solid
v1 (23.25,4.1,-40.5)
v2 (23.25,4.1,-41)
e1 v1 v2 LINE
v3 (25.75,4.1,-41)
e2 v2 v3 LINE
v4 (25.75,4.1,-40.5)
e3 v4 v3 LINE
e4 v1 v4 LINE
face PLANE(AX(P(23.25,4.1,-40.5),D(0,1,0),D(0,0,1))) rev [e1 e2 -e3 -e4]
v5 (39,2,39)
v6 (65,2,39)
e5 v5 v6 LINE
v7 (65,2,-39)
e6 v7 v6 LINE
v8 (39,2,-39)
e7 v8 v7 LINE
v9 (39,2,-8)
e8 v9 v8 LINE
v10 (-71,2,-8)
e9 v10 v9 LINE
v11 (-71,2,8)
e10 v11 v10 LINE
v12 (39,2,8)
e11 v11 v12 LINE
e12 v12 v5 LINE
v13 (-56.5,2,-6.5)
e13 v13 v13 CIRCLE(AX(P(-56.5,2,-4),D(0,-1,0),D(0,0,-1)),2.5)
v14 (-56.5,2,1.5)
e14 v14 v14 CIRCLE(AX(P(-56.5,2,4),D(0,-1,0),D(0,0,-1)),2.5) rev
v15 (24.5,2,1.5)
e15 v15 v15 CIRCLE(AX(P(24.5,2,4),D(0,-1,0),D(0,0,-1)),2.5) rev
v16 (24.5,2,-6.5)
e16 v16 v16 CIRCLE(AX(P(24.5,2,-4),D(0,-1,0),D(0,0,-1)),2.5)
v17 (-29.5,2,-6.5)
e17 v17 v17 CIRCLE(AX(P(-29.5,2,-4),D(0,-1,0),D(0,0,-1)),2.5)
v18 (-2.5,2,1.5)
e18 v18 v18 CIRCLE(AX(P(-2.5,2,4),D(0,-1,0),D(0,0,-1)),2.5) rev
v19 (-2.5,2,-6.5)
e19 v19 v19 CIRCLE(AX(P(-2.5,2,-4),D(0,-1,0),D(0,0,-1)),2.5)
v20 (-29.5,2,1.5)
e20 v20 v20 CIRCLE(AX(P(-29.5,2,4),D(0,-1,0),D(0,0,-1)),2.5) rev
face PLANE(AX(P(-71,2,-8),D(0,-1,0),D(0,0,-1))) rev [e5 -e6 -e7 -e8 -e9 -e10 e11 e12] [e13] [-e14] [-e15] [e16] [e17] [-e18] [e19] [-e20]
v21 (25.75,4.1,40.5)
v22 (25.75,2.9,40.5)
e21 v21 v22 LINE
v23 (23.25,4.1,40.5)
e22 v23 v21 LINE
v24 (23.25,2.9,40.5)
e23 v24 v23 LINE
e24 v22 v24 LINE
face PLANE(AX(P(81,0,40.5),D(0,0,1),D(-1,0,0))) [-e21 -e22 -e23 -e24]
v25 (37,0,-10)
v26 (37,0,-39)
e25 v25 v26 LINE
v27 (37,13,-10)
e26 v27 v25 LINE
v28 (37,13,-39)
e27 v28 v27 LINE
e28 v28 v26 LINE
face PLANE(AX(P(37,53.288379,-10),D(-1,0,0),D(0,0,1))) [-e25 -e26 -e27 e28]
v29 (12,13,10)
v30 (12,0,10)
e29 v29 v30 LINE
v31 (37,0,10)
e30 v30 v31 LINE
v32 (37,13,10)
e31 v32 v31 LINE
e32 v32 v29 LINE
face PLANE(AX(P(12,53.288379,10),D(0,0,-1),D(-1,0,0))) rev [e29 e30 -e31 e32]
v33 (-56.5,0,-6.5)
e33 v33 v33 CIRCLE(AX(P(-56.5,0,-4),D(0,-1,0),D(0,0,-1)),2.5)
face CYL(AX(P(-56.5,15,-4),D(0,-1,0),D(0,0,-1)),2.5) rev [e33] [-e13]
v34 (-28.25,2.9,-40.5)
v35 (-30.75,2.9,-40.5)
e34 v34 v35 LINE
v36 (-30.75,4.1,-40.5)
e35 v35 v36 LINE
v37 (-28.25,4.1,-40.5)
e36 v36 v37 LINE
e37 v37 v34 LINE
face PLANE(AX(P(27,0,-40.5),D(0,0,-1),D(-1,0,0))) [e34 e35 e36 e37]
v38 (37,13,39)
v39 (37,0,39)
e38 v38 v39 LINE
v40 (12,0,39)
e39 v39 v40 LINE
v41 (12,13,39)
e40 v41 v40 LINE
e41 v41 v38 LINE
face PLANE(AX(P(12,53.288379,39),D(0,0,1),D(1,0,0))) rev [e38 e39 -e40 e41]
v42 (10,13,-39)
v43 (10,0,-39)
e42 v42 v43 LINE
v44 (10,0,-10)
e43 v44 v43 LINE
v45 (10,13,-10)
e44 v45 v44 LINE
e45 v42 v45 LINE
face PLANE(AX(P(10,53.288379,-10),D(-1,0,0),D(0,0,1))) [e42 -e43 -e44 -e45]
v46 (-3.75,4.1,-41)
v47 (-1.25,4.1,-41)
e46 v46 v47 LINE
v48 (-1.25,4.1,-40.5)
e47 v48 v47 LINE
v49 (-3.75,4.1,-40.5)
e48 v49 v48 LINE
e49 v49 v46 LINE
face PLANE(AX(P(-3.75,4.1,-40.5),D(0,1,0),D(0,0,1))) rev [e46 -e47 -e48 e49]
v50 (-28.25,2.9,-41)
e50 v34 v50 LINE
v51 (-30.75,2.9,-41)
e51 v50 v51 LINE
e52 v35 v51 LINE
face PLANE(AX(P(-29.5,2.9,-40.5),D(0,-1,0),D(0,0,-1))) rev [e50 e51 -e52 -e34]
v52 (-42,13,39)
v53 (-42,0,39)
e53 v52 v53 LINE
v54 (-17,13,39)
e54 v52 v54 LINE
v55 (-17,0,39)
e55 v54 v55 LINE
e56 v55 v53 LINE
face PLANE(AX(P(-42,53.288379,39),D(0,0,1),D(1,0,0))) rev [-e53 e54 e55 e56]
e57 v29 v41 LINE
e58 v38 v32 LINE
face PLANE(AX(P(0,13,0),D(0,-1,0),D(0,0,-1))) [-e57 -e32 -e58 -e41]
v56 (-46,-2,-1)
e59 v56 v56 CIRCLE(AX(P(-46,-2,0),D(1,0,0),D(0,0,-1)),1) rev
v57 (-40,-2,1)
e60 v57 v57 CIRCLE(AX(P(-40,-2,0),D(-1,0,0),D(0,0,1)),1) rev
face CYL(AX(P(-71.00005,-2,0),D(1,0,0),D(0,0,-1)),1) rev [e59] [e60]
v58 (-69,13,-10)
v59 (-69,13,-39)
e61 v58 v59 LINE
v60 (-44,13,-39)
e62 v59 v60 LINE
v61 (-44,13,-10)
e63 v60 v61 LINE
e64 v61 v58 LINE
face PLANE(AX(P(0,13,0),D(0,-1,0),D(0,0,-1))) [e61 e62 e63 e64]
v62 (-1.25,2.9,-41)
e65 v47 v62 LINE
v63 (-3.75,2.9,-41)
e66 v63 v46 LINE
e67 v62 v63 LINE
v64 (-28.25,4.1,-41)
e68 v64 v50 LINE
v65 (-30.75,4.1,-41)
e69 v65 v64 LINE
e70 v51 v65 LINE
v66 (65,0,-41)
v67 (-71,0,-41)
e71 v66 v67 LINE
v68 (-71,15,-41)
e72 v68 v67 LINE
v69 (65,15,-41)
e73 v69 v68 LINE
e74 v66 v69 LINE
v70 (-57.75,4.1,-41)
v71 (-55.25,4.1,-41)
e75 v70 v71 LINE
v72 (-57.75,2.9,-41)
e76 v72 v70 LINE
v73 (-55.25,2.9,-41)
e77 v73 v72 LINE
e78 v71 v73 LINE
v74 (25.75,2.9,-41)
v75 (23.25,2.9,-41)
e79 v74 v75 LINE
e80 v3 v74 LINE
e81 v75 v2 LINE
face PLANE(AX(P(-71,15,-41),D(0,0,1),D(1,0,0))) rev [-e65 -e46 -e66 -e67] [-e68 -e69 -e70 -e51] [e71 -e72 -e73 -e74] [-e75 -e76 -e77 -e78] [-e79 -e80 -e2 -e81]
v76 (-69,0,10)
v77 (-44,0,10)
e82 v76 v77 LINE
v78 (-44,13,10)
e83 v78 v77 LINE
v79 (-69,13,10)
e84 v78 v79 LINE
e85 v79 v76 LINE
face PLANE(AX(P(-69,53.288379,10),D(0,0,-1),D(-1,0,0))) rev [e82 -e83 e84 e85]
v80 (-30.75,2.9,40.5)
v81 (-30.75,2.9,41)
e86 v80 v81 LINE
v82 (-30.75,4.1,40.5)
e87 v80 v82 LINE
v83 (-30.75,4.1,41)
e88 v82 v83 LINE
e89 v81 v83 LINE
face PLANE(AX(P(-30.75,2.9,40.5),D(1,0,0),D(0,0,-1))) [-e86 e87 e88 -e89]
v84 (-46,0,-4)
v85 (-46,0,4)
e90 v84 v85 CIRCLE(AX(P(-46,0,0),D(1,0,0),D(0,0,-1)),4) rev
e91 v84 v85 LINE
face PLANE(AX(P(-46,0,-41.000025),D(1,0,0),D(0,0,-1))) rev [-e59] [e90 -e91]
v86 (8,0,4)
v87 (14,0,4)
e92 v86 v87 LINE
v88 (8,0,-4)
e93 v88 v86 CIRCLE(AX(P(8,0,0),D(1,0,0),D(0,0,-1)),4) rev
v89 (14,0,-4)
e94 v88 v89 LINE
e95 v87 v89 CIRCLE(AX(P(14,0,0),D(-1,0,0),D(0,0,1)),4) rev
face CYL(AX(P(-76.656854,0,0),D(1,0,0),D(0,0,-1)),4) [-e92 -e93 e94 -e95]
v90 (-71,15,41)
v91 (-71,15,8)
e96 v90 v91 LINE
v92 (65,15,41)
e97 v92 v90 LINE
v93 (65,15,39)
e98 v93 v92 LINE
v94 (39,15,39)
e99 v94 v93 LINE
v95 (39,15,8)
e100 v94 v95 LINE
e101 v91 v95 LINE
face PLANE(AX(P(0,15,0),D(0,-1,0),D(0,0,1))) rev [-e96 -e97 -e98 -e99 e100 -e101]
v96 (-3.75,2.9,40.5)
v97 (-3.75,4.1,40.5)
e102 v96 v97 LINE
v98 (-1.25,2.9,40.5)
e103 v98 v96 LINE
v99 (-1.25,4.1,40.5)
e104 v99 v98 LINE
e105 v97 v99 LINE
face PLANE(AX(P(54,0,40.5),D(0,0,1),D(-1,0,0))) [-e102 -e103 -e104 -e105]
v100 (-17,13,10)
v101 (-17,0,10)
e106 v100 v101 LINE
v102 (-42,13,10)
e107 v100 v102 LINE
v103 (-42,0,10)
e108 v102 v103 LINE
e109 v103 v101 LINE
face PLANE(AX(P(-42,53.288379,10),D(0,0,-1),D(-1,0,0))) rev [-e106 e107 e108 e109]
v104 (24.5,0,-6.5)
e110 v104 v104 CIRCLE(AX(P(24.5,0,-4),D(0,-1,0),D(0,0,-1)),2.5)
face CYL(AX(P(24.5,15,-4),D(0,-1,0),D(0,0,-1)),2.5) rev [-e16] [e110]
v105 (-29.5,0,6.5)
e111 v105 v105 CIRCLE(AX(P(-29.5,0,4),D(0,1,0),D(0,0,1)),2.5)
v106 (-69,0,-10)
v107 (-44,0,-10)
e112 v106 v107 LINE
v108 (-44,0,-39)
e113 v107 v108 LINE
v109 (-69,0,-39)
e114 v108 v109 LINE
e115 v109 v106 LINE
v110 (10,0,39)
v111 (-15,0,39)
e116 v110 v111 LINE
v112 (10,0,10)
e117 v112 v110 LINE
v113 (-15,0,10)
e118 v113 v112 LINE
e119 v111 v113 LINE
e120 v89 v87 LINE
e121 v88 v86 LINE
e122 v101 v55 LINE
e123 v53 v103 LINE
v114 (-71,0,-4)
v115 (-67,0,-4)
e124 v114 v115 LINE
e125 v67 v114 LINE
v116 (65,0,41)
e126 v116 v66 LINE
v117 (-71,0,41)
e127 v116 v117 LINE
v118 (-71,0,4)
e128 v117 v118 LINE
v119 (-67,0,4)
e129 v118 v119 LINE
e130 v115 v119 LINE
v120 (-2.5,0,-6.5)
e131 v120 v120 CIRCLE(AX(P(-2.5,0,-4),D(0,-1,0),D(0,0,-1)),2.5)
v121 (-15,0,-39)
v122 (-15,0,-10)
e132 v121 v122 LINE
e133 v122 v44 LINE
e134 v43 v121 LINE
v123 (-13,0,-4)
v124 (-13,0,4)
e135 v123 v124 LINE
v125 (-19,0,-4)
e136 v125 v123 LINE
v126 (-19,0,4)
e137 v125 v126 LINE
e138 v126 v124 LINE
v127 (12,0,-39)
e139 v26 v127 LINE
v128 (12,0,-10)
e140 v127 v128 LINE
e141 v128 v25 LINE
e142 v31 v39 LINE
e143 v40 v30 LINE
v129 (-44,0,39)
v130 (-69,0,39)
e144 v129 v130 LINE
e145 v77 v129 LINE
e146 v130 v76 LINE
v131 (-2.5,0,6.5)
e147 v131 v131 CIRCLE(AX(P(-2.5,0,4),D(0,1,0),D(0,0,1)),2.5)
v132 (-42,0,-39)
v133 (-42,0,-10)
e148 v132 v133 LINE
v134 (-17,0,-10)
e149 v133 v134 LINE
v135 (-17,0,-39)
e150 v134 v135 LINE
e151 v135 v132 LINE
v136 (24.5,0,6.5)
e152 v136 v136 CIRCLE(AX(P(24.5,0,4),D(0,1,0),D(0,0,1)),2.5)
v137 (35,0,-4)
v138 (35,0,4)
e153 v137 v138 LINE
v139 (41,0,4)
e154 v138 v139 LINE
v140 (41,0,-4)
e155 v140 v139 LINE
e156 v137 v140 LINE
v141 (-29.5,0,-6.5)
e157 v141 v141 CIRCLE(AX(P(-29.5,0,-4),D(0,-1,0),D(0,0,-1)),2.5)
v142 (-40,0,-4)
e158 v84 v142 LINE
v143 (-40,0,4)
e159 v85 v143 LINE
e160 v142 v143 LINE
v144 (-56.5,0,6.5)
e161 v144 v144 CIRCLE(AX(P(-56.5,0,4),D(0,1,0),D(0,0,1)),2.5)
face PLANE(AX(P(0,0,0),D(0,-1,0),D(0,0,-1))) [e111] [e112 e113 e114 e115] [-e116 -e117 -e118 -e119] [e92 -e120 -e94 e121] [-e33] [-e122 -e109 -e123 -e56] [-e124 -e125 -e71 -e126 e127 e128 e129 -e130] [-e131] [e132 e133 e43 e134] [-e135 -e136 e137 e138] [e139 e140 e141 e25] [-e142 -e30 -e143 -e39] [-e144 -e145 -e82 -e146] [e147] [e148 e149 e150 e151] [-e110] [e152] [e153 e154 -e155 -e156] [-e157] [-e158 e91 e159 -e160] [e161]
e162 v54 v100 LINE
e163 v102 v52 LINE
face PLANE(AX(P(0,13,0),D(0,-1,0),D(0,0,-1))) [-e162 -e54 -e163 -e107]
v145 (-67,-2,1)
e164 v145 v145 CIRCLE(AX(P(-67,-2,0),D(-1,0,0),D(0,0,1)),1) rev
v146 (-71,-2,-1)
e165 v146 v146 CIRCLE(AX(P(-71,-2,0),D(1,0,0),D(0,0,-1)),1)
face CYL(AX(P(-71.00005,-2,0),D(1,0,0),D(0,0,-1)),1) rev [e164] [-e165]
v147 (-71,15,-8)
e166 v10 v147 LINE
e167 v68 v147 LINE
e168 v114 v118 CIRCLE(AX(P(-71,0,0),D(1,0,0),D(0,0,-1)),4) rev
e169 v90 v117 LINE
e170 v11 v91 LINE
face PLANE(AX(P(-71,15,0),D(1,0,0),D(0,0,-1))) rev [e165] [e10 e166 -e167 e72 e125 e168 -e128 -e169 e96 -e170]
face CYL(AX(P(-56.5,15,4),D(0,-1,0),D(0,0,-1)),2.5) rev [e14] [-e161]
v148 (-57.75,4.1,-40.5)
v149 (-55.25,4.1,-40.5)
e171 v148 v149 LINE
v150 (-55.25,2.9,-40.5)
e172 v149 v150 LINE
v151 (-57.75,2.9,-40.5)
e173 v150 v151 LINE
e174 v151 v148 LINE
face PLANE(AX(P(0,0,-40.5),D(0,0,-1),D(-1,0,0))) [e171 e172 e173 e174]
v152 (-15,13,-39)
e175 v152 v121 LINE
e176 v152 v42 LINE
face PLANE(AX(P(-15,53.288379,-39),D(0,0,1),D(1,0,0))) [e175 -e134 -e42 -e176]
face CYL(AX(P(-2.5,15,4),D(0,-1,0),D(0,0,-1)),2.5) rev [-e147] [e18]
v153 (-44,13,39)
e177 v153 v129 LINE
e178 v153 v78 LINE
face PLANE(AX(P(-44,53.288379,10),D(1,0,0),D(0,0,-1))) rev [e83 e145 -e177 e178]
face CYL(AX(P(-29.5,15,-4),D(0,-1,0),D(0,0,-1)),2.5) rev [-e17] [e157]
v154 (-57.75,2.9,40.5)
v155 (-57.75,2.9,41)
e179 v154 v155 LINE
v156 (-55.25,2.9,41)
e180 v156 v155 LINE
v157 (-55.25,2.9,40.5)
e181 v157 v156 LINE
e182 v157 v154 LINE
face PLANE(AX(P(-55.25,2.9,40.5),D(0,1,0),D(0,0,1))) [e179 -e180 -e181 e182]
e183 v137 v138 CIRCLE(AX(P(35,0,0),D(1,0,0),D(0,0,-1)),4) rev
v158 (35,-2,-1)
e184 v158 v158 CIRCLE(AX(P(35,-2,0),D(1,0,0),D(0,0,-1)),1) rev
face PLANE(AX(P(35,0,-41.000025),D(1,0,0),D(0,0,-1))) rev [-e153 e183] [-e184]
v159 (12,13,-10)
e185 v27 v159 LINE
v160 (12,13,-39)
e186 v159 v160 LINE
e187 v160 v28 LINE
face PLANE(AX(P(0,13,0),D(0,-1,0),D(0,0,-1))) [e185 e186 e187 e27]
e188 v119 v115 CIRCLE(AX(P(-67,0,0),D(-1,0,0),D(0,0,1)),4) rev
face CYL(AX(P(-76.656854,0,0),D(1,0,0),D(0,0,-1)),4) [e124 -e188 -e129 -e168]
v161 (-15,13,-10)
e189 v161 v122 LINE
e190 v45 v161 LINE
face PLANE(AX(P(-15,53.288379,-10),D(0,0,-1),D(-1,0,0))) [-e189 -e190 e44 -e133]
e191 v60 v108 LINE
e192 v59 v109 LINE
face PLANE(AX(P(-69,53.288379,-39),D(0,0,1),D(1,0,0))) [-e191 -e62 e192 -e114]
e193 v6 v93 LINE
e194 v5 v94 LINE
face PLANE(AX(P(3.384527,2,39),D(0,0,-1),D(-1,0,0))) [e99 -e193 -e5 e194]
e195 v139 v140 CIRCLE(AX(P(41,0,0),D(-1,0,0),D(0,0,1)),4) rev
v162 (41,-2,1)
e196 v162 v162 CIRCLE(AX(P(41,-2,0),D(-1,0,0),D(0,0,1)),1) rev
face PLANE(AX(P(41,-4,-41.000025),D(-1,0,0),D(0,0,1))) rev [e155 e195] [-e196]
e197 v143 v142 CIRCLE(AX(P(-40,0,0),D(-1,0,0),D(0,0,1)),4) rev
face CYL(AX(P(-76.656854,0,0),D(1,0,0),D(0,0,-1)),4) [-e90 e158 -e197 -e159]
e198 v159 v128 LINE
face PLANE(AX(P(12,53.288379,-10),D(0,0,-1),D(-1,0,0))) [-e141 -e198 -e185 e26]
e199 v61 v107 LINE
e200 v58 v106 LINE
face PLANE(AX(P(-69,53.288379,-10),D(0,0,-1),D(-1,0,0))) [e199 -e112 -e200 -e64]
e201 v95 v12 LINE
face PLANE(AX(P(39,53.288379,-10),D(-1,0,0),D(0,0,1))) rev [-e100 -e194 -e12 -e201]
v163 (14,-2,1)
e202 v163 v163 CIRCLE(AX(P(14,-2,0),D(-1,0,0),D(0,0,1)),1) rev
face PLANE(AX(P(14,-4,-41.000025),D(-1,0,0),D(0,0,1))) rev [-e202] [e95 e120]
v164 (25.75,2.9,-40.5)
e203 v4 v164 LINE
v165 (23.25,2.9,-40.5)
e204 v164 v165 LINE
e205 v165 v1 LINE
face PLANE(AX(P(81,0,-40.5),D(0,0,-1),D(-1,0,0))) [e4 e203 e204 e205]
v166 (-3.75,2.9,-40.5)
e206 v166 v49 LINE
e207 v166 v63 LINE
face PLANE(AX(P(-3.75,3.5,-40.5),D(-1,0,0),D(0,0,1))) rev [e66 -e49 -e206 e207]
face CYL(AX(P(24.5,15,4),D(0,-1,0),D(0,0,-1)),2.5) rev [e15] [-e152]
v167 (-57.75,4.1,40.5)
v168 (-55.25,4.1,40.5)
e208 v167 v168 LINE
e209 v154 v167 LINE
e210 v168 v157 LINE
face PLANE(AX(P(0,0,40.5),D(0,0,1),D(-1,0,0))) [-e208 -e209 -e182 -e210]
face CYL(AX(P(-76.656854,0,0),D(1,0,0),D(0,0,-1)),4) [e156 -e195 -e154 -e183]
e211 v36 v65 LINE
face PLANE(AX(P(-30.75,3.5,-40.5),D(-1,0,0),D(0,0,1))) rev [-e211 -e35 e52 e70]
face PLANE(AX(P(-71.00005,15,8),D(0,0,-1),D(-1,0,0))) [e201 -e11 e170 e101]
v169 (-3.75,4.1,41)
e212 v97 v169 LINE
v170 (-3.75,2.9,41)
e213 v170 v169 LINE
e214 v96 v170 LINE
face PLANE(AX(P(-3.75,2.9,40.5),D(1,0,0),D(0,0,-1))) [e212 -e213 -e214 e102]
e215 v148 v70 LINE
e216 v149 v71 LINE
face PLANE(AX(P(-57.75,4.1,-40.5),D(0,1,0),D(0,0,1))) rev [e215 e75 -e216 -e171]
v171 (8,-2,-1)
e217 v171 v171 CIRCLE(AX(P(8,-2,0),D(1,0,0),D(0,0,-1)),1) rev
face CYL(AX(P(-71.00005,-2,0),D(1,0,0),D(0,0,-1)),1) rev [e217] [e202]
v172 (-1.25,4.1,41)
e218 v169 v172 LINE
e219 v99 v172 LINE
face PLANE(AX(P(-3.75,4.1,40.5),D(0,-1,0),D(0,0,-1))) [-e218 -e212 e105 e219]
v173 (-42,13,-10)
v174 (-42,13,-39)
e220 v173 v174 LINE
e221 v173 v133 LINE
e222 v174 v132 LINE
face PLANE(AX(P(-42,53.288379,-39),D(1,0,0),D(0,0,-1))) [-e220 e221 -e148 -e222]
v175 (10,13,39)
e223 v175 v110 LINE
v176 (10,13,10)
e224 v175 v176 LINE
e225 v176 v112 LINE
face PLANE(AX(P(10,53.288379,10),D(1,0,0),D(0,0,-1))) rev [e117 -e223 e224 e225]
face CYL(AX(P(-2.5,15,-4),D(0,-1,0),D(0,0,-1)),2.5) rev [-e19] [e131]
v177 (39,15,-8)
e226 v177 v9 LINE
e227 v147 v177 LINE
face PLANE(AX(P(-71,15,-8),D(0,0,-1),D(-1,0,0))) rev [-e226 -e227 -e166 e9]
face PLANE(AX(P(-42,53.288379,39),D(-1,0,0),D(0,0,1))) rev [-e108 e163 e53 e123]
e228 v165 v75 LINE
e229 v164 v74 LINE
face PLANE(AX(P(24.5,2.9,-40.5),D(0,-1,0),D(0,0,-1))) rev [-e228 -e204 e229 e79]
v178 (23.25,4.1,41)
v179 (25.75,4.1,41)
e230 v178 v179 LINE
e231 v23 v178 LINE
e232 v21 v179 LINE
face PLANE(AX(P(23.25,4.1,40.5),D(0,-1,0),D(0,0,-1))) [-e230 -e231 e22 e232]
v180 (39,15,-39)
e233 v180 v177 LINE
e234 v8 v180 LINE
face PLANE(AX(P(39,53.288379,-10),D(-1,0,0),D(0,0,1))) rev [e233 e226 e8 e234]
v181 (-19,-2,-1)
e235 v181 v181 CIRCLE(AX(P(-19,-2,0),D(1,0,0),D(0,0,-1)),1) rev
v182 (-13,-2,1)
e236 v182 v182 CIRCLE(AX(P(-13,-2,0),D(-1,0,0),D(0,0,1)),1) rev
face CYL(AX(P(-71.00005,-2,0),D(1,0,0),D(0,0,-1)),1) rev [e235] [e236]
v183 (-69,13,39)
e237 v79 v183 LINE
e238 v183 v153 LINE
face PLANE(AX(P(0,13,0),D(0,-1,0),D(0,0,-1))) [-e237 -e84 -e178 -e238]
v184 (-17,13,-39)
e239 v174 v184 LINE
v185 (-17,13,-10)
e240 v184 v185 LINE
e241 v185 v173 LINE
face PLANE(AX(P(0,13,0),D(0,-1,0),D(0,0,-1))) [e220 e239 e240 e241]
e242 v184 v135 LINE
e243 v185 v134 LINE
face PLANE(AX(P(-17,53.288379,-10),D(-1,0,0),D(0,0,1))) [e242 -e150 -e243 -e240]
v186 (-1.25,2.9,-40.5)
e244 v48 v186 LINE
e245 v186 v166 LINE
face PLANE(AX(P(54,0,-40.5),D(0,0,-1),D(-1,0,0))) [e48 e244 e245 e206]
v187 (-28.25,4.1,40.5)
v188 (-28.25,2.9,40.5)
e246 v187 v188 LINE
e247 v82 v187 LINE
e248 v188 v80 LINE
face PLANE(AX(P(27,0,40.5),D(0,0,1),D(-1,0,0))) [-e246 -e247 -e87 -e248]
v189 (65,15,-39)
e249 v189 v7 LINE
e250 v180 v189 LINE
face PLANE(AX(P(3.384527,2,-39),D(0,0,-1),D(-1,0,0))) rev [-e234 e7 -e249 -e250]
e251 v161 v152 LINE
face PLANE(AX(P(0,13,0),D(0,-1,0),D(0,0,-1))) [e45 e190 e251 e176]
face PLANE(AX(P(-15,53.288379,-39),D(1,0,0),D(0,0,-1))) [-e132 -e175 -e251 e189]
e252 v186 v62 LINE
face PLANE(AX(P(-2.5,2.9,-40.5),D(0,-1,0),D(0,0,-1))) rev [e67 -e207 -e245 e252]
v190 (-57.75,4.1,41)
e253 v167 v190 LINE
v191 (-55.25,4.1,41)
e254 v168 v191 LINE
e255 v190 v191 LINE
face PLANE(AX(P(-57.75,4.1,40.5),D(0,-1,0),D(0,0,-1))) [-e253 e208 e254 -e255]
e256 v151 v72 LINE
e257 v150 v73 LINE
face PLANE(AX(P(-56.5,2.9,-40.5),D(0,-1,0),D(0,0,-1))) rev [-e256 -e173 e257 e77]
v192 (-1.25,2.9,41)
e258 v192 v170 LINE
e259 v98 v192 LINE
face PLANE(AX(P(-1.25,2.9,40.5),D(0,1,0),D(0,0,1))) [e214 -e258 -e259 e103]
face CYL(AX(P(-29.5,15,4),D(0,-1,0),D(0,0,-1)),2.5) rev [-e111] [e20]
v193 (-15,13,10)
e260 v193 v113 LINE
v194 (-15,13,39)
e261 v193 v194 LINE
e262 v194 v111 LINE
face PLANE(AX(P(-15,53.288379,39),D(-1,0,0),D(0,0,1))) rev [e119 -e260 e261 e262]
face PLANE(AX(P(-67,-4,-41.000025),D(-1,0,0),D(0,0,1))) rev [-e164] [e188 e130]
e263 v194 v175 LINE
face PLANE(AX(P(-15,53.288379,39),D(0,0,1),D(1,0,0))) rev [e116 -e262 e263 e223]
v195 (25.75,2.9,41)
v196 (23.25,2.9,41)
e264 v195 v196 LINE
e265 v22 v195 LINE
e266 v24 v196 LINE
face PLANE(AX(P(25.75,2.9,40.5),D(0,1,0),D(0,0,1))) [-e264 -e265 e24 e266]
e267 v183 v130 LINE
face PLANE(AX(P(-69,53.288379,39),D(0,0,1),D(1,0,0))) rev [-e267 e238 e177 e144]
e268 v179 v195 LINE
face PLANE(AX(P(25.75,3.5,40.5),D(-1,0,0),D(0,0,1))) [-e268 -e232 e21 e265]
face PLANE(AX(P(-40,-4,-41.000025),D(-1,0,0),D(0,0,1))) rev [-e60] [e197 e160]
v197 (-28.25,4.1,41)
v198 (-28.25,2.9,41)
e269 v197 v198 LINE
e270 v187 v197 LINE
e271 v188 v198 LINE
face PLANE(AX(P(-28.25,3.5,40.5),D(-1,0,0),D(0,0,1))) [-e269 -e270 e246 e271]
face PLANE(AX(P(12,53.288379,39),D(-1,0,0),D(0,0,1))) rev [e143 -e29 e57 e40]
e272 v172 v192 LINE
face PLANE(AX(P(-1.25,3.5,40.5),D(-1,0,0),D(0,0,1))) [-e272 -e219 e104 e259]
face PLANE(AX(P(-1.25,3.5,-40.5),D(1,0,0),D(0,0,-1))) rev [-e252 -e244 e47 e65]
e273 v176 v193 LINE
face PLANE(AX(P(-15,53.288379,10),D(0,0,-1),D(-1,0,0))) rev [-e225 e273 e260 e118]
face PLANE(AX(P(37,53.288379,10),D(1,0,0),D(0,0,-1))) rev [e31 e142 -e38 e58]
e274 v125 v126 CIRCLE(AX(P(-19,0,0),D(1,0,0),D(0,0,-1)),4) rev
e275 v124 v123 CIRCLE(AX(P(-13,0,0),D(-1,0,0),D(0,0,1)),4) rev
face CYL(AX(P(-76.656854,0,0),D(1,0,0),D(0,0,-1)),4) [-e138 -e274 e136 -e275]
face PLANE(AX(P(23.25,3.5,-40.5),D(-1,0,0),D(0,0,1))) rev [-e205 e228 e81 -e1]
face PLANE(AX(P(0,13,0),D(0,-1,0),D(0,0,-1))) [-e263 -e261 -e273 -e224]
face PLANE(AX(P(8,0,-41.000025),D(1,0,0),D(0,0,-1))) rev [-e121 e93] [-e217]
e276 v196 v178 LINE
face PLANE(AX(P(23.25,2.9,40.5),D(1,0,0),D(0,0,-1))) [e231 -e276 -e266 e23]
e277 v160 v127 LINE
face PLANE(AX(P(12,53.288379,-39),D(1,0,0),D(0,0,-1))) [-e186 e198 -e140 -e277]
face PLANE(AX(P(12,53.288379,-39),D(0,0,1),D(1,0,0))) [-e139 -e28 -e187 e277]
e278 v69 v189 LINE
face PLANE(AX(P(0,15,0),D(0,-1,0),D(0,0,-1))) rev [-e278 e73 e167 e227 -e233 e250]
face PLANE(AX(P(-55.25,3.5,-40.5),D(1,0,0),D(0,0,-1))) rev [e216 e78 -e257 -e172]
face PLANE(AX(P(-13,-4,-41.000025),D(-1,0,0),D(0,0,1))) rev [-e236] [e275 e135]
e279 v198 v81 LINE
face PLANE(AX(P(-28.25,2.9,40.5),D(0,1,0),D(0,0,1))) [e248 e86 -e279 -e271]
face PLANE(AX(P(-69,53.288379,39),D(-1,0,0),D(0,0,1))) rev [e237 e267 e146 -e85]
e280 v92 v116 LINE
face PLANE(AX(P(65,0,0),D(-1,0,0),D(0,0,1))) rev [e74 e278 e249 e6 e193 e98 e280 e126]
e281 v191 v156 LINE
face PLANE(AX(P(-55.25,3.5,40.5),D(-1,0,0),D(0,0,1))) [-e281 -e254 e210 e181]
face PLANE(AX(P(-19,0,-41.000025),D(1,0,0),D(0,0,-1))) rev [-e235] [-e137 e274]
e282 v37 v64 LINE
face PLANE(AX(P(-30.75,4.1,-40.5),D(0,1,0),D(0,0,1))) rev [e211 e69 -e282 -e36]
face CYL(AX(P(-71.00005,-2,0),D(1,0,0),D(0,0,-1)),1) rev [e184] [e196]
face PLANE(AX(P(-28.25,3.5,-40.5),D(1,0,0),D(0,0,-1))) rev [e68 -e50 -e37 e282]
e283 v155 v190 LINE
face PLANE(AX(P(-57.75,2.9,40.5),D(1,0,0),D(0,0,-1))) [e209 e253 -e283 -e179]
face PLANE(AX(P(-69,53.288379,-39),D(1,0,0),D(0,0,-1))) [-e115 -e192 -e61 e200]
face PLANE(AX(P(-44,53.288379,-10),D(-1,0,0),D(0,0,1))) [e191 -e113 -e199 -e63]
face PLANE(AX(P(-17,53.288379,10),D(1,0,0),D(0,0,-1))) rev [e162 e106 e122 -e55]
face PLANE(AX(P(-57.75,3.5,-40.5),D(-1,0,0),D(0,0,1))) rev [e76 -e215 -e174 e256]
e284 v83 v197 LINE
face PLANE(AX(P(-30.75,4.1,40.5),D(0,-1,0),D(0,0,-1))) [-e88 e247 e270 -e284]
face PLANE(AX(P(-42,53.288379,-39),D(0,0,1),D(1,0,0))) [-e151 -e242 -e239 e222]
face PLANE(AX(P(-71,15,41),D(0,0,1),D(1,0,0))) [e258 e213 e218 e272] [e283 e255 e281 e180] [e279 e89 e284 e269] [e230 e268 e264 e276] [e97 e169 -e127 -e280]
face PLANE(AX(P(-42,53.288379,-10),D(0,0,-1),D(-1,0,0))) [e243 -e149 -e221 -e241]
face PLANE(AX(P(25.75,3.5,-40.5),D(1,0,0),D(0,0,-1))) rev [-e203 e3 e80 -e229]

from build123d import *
from build123d.topology import SkipClean

# Parameters (mm, degrees)
EXTRUDE_1_DEPTH        = 15
SKETCH_4_W             = 25
SKETCH_4_H             = 29
CUT_EXTRUDE_2_DEPTH    = 13
PATTERN_LINEAR_1_COUNT = 4
PATTERN_LINEAR_1_PITCH = 27
CUT_EXTRUDE_3_DEPTH    = 149.559752288
EXTRUDE_2_DEPTH        = 142
CUT_EXTRUDE_4_DEPTH    = 149.559752288
SKETCH_14_W            = 21
SKETCH_14_H            = 4
CUT_EXTRUDE_7_DEPTH    = 84.348665256
PATTERN_LINEAR_3_COUNT = 5
PATTERN_LINEAR_3_PITCH = 27
CUT_EXTRUDE_8_DEPTH    = 84.348665256
SKETCH_17_R            = 2.5
CUT_EXTRUDE_9_DEPTH    = 84.348665256
PATTERN_LINEAR_4_COUNT = 4
PATTERN_LINEAR_4_PITCH = 27
SKETCH_21_W            = 31
SKETCH_21_H            = 13
CUT_EXTRUDE_11_DEPTH   = 32
CUT_EXTRUDE_12_DEPTH   = 0.5
PATTERN_LINEAR_5_COUNT = 4
PATTERN_LINEAR_5_PITCH = 27
CUT_EXTRUDE_13_DEPTH   = 6


# Read off the part's stored shape, not the designer's step: 镜向1
with BuildPart() as part:
    # 草图3 → 凸台-拉伸1 (new body)
    with BuildSketch(Plane(origin=(0, 0, 0), x_dir=(1, 0, 0), z_dir=(0, 1, 0))):
        Polygon((0, 0), (-71, 0), (-71, 41), (71, 41), (71, 0), align=None)
    extrude(amount=EXTRUDE_1_DEPTH)

    # 草图4 → 切除-拉伸2 (cut)
    with BuildSketch(Plane(origin=(0, 0, 0), x_dir=(1, 0, 0), z_dir=(0, 1, 0))):
        with Locations((-56.5, 24.5)):
            Rectangle(SKETCH_4_W, SKETCH_4_H)
    cut_extrude_2 = extrude(amount=CUT_EXTRUDE_2_DEPTH, mode=Mode.SUBTRACT)

    # 阵列(线性)1: 切除-拉伸2 ×4
    with Locations(*[(i * PATTERN_LINEAR_1_PITCH, 0, 0) for i in range(1, PATTERN_LINEAR_1_COUNT)]):
        add(cut_extrude_2, mode=Mode.SUBTRACT)

    # 草图6 → 切除-拉伸3 (cut, through all)
    with BuildSketch(Plane(origin=(71, 0, 0), x_dir=(0, 0, -1), z_dir=(1, 0, 0))):
        Polygon((0, 15), (7.5, 15), (8, 15), (8, 2), (7.5, 2), (0, 2), align=None)
    extrude(amount=-CUT_EXTRUDE_3_DEPTH, mode=Mode.SUBTRACT)

    # 草图7 → 凸台-拉伸2 (add)
    with BuildSketch(Plane(origin=(71, 0, 0), x_dir=(0, 0, -1), z_dir=(1, 0, 0))):
        with BuildLine():
            Line((0, 0), (4, 0))
            ThreePointArc((4, 0), (2.828427125, -2.828427125), (0, -4))
            Line((0, -4), (0, 0))
        make_face()
    extrude(amount=-EXTRUDE_2_DEPTH)

    # 草图8 → 切除-拉伸4 (cut, through all)
    with BuildSketch(Plane(origin=(71, 0, 0), x_dir=(0, 0, -1), z_dir=(1, 0, 0))):
        with BuildLine():
            Line((0, -1), (0, -2))
            Line((0, -2), (0, -3))
            ThreePointArc((0, -3), (1, -2), (0, -1))
        make_face()
    extrude(amount=-CUT_EXTRUDE_4_DEPTH, mode=Mode.SUBTRACT)

    # 草图14 → 切除-拉伸7 (cut, through all)
    with BuildSketch(Plane.XY):
        with Locations((-56.5, -2)):
            Rectangle(SKETCH_14_W, SKETCH_14_H)
    cut_extrude_7 = extrude(amount=-CUT_EXTRUDE_7_DEPTH, mode=Mode.SUBTRACT)

    # 阵列(线性)3: 切除-拉伸7 ×5
    with Locations(*[(i * PATTERN_LINEAR_3_PITCH, 0, 0) for i in range(1, PATTERN_LINEAR_3_COUNT)]):
        add(cut_extrude_7, mode=Mode.SUBTRACT)

    # 草图16 → 切除-拉伸8 (cut, through all)
    with BuildSketch(Plane.XY):
        Polygon((71, -1), (71, 0), (42.178247133, 0), (42.178247133, -4), (71, -4), align=None)
    extrude(amount=-CUT_EXTRUDE_8_DEPTH, mode=Mode.SUBTRACT)

    # 草图17 → 切除-拉伸9 (cut, through all)
    with BuildSketch(Plane.XZ):
        with Locations(Location((-56.5, -4, 0), (0, 0, 270))):
            Circle(SKETCH_17_R)
    cut_extrude_9 = extrude(amount=-CUT_EXTRUDE_9_DEPTH, mode=Mode.SUBTRACT)

    # 阵列(线性)4: 切除-拉伸9 ×4
    with Locations(*[(i * PATTERN_LINEAR_4_PITCH, 0, 0) for i in range(1, PATTERN_LINEAR_4_COUNT)]):
        add(cut_extrude_9, mode=Mode.SUBTRACT)

    # 草图21 → 切除-拉伸11 (cut)
    with BuildSketch(Plane(origin=(71, 0, 0), x_dir=(0, 0, -1), z_dir=(1, 0, 0))):
        with Locations((23.5, 8.5)):
            Rectangle(SKETCH_21_W, SKETCH_21_H)
    extrude(amount=-CUT_EXTRUDE_11_DEPTH, mode=Mode.SUBTRACT)

    # 草图23 → 切除-拉伸12 (cut)
    with BuildSketch(Plane(origin=(0, 0, -41), x_dir=(-1, 0, 0), z_dir=(0, 0, -1))):
        Polygon((55.25, 2.9), (56.5, 2.9), (57.75, 2.9), (57.75, 3.5), (57.75, 4.1), (55.25, 4.1), (55.25, 3.5), align=None)
    cut_extrude_12 = extrude(amount=-CUT_EXTRUDE_12_DEPTH, mode=Mode.SUBTRACT)

    # 阵列(线性)5: 切除-拉伸12 ×4
    with Locations(*[(i * PATTERN_LINEAR_5_PITCH, 0, 0) for i in range(1, PATTERN_LINEAR_5_COUNT)]):
        add(cut_extrude_12, mode=Mode.SUBTRACT)

    # 镜向1: part across plane


with BuildPart() as part_1:
    with SkipClean():  # the faces are left unmerged after this step: merging them gives an invalid solid
        add(part.part)
        add(part.part.mirror(Plane.XY))

    # 草图25 → 切除-拉伸13 (cut)
    with SkipClean():  # the faces are left unmerged after this step: merging them gives an invalid solid
        with BuildSketch(Plane(origin=(71, 0, 0), x_dir=(0, 0, -1), z_dir=(1, 0, 0))):
            Polygon((41, 15), (41, 0), (-41, 0), (-41, 15), (-39, 15), (-39, 2), (39, 2), (39, 15), align=None)
        extrude(amount=-CUT_EXTRUDE_13_DEPTH, mode=Mode.SUBTRACT)


solid = part_1.part
